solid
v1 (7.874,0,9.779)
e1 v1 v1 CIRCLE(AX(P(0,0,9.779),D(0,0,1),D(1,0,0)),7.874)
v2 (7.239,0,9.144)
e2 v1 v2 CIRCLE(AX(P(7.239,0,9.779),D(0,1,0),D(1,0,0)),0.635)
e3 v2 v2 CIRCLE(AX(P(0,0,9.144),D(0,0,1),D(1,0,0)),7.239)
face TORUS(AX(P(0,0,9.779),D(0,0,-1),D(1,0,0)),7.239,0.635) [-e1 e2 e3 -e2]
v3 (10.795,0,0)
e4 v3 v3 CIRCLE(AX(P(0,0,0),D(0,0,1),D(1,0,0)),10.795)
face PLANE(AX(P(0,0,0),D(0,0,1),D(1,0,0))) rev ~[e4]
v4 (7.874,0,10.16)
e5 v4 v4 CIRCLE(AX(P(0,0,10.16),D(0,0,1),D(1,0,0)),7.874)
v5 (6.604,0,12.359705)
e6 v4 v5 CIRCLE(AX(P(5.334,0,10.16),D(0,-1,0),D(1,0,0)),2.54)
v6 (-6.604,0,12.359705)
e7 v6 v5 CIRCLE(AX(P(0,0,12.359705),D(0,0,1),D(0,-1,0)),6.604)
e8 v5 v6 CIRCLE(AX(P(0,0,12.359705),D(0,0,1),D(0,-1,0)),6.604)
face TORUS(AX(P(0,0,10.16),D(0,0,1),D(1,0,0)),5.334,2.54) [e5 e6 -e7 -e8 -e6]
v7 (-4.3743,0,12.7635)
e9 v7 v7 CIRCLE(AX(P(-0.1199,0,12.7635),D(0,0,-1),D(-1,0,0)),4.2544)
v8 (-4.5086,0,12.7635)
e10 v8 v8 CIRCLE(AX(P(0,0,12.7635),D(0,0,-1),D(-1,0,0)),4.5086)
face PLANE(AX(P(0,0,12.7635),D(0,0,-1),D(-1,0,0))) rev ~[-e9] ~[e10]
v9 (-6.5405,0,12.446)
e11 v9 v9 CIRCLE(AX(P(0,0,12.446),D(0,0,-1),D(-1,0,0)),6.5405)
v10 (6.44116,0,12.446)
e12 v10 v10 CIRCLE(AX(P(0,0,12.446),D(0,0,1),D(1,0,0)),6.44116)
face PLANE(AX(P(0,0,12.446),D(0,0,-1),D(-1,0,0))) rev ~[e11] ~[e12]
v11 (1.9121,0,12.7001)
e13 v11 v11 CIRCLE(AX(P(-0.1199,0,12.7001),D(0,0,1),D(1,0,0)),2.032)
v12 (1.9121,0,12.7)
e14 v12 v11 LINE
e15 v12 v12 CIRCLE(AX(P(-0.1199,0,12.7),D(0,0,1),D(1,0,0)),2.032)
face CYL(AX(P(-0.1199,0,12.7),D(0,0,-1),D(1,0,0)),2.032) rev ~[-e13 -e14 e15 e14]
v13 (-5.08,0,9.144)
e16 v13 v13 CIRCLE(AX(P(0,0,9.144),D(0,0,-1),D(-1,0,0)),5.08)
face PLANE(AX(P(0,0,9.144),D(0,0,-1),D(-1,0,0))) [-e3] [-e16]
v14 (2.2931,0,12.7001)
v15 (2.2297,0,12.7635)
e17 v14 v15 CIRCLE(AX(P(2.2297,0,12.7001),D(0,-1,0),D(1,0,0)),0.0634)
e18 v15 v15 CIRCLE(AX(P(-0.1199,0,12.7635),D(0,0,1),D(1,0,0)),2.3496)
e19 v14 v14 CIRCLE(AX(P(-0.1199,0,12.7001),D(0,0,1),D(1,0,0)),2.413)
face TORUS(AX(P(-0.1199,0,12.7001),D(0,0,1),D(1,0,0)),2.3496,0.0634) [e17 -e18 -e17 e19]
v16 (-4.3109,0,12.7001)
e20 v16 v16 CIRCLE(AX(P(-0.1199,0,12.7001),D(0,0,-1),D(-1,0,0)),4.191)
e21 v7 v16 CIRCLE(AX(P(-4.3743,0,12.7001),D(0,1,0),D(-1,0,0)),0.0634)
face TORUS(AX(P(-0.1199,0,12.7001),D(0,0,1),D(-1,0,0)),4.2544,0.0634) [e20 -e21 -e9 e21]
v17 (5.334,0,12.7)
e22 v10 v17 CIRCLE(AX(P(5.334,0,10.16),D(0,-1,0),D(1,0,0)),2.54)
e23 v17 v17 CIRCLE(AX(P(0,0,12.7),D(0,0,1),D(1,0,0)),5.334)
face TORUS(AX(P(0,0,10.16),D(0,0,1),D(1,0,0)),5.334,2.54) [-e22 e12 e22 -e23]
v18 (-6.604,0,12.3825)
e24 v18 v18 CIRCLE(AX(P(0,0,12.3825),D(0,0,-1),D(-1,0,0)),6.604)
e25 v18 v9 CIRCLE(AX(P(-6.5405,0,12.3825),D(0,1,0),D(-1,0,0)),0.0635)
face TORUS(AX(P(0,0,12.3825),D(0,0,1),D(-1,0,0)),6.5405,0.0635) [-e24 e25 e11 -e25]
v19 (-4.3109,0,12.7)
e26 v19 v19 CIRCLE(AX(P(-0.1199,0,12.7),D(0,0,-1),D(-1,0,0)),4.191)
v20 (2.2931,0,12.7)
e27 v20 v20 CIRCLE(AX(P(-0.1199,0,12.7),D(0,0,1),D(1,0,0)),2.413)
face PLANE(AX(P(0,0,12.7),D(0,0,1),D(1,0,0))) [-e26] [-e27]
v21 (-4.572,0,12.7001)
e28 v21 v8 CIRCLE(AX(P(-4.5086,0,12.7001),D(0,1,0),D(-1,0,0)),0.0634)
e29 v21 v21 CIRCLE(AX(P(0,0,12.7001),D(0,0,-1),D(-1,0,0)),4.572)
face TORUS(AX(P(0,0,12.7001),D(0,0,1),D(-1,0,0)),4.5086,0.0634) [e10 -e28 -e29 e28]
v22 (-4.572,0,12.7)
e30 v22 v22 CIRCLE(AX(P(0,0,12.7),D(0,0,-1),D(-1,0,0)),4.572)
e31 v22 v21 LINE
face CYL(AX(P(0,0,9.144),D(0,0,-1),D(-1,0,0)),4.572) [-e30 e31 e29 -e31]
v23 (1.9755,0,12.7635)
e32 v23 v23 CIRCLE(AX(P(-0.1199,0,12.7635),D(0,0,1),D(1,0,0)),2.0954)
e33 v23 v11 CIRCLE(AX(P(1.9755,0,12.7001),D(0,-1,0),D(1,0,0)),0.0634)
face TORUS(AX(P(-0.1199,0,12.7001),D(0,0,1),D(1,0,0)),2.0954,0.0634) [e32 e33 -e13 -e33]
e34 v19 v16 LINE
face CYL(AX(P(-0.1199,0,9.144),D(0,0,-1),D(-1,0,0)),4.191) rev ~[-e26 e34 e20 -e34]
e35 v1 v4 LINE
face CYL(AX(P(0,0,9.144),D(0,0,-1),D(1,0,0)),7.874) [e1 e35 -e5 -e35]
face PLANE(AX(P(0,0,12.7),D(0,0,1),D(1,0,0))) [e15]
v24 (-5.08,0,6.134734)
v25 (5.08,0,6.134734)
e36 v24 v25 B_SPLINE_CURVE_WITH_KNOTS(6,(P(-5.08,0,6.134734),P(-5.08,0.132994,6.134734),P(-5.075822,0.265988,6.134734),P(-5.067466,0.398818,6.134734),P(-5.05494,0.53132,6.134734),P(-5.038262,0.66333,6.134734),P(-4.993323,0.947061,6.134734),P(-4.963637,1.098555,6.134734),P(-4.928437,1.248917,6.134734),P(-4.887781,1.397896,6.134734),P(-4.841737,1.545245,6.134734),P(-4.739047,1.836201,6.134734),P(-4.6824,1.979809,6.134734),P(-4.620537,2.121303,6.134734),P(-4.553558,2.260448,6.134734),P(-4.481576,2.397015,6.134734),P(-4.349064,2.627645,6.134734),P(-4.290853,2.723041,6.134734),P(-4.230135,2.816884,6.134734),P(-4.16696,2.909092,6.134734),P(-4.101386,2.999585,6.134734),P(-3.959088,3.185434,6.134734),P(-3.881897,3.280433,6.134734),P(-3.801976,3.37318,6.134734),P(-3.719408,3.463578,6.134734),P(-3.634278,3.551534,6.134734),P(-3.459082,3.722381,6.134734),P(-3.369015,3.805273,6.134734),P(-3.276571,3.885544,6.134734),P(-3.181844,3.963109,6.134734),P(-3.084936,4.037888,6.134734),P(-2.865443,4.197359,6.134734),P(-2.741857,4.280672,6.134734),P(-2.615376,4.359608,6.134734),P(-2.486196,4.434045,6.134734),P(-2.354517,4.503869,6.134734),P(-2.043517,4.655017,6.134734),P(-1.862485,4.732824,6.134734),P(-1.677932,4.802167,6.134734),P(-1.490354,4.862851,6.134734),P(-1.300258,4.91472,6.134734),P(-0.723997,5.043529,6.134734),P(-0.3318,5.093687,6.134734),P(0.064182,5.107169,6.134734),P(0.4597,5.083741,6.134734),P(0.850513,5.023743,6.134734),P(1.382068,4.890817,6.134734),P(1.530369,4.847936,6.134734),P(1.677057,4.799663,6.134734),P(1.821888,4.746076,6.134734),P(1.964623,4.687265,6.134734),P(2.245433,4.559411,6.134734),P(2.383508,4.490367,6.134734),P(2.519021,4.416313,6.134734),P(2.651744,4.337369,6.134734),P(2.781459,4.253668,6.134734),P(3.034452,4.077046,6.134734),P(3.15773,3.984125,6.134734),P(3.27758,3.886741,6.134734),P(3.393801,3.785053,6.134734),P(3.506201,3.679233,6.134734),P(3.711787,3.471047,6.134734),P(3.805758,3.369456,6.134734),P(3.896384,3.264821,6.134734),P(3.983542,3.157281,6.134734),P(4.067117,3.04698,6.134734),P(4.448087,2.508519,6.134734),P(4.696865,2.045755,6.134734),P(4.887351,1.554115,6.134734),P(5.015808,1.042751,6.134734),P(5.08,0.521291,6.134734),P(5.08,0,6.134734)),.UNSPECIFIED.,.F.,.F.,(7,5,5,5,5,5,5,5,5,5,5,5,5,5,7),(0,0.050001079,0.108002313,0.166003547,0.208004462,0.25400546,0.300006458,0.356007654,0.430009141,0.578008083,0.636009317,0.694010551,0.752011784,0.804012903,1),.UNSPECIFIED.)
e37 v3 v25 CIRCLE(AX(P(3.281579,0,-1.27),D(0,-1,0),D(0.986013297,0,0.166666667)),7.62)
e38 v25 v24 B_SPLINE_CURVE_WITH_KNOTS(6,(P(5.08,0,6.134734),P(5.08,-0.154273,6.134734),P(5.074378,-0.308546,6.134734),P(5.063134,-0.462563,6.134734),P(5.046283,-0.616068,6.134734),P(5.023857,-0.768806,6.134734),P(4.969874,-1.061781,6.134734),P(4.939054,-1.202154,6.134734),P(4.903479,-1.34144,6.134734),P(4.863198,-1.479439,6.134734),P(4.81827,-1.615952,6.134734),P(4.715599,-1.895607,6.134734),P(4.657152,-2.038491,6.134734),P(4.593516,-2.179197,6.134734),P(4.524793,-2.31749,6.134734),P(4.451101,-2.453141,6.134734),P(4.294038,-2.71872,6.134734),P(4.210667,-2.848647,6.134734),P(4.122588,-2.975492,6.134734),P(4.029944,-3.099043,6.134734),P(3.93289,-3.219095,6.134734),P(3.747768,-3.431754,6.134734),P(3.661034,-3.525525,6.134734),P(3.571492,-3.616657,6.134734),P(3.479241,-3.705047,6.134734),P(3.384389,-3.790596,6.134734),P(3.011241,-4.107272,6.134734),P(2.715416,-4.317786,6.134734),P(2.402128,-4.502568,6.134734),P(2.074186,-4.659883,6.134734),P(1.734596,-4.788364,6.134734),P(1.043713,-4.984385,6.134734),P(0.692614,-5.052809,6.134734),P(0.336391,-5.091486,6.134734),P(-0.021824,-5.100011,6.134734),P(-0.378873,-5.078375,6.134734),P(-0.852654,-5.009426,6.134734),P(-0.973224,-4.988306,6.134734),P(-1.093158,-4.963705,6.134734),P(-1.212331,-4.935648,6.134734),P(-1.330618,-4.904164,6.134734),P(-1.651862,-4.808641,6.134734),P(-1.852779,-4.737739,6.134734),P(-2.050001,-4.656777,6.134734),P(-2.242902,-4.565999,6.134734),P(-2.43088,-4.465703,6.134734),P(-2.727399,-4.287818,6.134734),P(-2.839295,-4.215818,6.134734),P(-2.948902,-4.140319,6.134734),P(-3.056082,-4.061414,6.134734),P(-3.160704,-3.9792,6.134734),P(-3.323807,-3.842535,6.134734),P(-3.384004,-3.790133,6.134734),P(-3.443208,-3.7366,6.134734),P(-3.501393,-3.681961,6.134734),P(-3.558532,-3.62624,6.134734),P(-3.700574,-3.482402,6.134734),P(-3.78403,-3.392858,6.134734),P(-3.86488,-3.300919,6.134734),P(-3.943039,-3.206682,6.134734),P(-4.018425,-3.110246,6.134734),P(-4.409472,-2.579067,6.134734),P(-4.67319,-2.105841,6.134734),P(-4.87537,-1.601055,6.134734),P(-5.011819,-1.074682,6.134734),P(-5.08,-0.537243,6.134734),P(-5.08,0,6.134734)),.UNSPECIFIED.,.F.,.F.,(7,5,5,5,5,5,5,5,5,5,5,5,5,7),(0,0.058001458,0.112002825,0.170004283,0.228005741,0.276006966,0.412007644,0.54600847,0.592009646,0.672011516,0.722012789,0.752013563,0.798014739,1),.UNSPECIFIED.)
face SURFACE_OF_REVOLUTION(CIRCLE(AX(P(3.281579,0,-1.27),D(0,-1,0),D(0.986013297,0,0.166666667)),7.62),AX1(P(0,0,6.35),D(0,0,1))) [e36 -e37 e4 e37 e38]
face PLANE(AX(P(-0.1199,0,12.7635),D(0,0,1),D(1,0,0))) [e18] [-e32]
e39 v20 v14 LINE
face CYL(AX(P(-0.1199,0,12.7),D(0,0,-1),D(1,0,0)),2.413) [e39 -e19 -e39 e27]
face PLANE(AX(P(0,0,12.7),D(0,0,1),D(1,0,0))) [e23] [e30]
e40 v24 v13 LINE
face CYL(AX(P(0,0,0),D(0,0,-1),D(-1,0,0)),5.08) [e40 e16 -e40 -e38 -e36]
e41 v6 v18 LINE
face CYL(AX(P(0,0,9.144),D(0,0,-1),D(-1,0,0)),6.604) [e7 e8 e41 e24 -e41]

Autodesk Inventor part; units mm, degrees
ref_plane "YZ Plane" through (0, 0, 0) normal (1, 0, 0) x (0, 1, 0)
ref_plane "XZ Plane" through (0, 0, 0) normal (0, 1, 0) x (-1, 0, 0)
ref_plane "XY Plane" through (0, 0, 0) normal (0, 0, 1) x (1, 0, 0)
sketch "Sketch1" plane through (0, 0, 0) normal (0, 0, 1) x (1, 0, 0)
  circle A0 centre (0, 0) radius 10.795
  dimension "d0" = 21.59
extrude "Extrusion1" add sketch "Sketch1" along normal blind 6.35
fillet "Fillet1" radius 7.62 1 edges at (-10.795, 0, 6.35)
sketch "Sketch2" plane through (0, 0, 0) normal (0, 0, -1) x (-1, 0, 0)
  circle A0 centre (0, 0) radius 10.795 projected
  circle A1 centre (0, 0) radius 5.08
  dimension "d4" = 10.16
extrude "Extrusion2" add sketch "Sketch2" against normal blind 9.144 contours A1
sketch "Sketch3" plane through (0, 0, 9.144) normal (0, 0, 1) x (1, 0, 0)
  circle A0 centre (0, 0) radius 5.08 projected
  circle A1 centre (0, 0) radius 7.874
  dimension "d7" = 15.748
extrude "Extrusion3" add sketch "Sketch3" along normal blind 3.556 contours A0 | A1
fillet "Fillet2" radius 2.54 1 edges at (-7.874, 0, 12.7)
fillet "Fillet3" radius 0.635 1 edges at (-7.874, 0, 9.144)
sketch "Sketch4" plane through (0, 0, 9.144) normal (0, 0, -1) x (-1, 0, 0)
  circle A0 centre (0, 0) radius 5.08 projected
  circle A1 centre (0, 0) radius 7.239 projected
  circle A2 centre (0, 0) radius 6.604
  circle A3 centre (0, 0) radius 5.969
  dimension "d12" = 13.208
  dimension "d13" = 11.938
extrude "Extrusion4" add sketch "Sketch4" against normal blind 3.302 contours A2
fillet "Fillet4" radius 0.0635 1 edges at (6.604, 0, 12.446)
sketch "Sketch5" plane through (0, 0, 9.144) normal (0, 0, -1) x (-1, 0, 0)
  circle A0 centre (0, 0) radius 7.239 projected
  circle A1 centre (0, 0) radius 5.08 projected
  circle A2 centre (0, 0) radius 4.572
  circle A3 centre (0.1199, 0) radius 4.191
  dimension "d17" = 9.144
  dimension "d18" = 8.382
extrude "Extrusion5" add sketch "Sketch5" against normal blind 3.6195 contours A2
fillet "Fillet5" radius 0.0635 2 edges at (4.0711, 0, 12.7635) (4.572, 0, 12.7635)
sketch "Sketch6" plane through (-0.1199, 0, 12.7) normal (0, 0, 1) x (1, 0, 0)
  circle A0 centre (0, 0) radius 4.191 projected
  circle A1 centre (0, 0) radius 2.413
  circle A2 centre (0, 0) radius 2.032
  point P0 (0.1199, 0)
  dimension "d22" = 4.826
  dimension "d23" = 4.064
extrude "Extrusion6" add sketch "Sketch6" along normal blind 0.0635 contours A1
fillet "Fillet6" radius 0.0635 2 edges at (-2.1519, 0, 12.7635) (-2.5329, 0, 12.7635)
properties part number "Control Stick"
